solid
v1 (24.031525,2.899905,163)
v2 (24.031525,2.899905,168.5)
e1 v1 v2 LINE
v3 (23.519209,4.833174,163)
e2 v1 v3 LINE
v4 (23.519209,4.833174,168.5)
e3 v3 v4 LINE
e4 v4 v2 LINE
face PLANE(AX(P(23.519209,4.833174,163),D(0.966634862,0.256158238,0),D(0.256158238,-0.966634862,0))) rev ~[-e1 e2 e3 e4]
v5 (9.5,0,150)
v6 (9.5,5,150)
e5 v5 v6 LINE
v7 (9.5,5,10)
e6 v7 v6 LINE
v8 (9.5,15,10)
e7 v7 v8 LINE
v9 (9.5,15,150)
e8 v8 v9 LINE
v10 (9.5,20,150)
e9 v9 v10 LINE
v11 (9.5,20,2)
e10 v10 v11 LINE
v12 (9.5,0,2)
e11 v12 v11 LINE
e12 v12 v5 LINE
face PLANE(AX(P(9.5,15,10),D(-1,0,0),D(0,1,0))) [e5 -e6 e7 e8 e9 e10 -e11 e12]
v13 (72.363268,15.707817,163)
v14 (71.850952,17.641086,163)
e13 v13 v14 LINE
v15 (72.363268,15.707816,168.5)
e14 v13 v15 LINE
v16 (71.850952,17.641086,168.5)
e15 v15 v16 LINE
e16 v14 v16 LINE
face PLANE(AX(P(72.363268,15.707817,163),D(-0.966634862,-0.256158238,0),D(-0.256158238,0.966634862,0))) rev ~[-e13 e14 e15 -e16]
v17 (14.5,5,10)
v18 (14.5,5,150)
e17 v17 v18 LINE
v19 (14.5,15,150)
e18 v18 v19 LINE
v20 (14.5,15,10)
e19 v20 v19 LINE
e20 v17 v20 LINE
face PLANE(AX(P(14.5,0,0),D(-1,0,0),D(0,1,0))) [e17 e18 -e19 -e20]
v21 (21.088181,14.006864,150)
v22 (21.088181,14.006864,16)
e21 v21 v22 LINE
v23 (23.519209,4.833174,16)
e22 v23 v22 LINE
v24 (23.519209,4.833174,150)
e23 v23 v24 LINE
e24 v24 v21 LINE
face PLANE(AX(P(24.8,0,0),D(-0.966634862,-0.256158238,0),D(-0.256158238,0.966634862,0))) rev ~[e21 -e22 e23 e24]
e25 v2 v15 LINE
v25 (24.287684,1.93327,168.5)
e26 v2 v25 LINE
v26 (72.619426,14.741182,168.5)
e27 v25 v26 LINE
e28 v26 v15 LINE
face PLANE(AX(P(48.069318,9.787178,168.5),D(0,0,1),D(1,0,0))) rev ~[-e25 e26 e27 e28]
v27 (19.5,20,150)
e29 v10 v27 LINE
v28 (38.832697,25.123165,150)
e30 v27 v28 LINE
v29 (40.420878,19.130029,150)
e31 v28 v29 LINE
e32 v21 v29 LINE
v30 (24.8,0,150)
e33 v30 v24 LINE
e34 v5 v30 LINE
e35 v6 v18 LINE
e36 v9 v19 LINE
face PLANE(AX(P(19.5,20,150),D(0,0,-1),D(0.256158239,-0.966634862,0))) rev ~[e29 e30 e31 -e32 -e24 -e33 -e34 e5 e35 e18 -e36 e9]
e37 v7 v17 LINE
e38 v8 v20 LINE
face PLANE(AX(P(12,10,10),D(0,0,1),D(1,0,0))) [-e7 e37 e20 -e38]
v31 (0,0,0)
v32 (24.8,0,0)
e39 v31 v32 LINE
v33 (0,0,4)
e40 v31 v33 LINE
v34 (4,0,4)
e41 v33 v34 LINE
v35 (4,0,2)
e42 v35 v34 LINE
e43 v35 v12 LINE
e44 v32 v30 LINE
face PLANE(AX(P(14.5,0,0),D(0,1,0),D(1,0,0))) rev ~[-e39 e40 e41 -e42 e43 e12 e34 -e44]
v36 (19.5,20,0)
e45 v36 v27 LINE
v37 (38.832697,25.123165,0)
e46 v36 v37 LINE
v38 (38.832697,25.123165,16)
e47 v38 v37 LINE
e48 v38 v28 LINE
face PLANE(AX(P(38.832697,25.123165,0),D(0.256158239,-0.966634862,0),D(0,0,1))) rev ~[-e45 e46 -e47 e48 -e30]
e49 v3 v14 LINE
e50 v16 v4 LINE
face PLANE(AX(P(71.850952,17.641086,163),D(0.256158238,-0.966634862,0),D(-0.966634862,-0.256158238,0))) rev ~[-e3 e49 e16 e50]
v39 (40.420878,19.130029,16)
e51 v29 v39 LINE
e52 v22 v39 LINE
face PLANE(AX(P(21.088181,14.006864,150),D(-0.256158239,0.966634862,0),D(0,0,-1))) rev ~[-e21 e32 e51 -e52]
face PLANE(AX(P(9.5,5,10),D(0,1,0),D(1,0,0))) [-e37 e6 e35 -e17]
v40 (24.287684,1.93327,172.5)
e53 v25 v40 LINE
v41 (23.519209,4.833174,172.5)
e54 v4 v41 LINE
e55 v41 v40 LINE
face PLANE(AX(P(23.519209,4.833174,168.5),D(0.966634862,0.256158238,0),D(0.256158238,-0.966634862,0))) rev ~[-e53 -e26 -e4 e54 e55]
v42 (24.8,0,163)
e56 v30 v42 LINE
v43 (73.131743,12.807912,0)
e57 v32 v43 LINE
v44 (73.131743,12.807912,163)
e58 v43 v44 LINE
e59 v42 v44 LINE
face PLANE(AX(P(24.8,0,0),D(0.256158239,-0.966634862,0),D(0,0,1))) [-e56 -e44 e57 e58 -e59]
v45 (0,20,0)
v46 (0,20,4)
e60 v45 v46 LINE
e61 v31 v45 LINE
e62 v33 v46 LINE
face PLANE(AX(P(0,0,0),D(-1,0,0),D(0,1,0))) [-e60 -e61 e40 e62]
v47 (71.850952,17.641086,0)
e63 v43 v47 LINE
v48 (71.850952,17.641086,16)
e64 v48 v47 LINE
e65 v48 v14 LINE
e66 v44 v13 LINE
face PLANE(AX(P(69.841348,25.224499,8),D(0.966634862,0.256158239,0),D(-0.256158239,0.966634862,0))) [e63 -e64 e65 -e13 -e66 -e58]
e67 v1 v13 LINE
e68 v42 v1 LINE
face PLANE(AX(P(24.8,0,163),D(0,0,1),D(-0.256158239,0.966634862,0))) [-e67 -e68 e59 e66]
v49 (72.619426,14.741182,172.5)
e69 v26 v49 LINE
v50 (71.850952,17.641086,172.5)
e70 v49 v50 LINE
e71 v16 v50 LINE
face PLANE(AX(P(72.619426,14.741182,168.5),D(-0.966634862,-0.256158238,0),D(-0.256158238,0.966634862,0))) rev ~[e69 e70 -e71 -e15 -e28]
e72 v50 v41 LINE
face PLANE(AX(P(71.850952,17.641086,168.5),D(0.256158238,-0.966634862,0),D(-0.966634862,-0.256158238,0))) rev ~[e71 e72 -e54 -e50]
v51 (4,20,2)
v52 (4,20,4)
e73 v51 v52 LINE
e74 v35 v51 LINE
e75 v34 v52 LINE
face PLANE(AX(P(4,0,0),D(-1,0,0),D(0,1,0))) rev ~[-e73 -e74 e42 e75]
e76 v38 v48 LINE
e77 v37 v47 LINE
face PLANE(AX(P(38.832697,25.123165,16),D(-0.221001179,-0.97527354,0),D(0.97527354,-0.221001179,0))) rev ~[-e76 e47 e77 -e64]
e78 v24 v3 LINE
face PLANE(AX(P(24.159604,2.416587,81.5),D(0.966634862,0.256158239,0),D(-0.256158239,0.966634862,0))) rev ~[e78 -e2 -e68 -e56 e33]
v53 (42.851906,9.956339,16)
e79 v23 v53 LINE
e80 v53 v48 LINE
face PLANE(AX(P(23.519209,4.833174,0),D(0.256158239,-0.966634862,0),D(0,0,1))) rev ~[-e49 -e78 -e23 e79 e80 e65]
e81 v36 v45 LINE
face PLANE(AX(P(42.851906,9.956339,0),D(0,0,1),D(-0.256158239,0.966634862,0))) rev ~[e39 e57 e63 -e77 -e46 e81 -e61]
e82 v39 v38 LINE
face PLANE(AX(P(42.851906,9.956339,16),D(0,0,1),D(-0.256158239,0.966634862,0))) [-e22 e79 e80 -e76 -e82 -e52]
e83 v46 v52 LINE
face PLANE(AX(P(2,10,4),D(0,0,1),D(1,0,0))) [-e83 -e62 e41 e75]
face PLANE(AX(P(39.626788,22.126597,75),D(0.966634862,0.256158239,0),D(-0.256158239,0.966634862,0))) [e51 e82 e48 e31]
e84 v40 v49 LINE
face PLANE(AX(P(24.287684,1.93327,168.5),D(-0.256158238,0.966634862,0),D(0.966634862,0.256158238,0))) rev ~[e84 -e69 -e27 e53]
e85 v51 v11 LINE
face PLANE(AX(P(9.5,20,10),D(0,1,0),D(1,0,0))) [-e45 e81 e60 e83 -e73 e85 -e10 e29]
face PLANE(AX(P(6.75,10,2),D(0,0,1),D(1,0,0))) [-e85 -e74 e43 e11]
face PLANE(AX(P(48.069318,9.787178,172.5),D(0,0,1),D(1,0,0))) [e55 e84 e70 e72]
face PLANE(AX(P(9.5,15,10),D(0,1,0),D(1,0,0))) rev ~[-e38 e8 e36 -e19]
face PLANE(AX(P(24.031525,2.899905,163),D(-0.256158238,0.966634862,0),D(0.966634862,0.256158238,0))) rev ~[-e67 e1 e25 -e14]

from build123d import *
from build123d import SkipClean  # not in build123d's __all__

# Parameters (mm, degrees)
F0_W      = 4
F0_H      = 20
F1_DEPTH  = 4
F2_W      = 5.5
F2_H      = 20
F3_DEPTH  = 2
F4_W      = 5
F4_H      = 20
F5_DEPTH  = 10
F6_W      = 5
F6_H      = 20
F7_DEPTH  = 150
F8_W      = 5
F8_H      = 5
F9_DEPTH  = 140
F10_W     = 5
F10_H     = 163
F11_DEPTH = 50
F12_W     = 9.4903359083
F12_H     = 16
F13_DEPTH = 20
F14_W     = 15.6903359083
F14_H     = 16
F15_DEPTH = 30
F17_DEPTH = 16
F19_DEPTH = 5.5
F21_DEPTH = 4


with BuildPart() as f1:
    # F0 (on Top) → F1 (new body)
    with BuildSketch(Plane.XY):
        with Locations((2, 10)):
            Rectangle(F0_W, F0_H)
    extrude(amount=F1_DEPTH)

    # F2 (on Top) → F3 (join)
    with BuildSketch(Plane.XY):
        with Locations((6.75, 10)):
            Rectangle(F2_W, F2_H)
    extrude(amount=F3_DEPTH)

    # F4 (on Top) → F5 (join)
    with BuildSketch(Plane.XY):
        with Locations((12, 10)):
            Rectangle(F4_W, F4_H)
    extrude(amount=F5_DEPTH)

    # F6 (on Top) → F7 (join)
    with BuildSketch(Plane.XY):
        with Locations((17, 10)):
            Rectangle(F6_W, F6_H)
        Polygon((24.8, 0), (19.5, 20), (19.5, 0), align=None)
    extrude(amount=F7_DEPTH)

    # F8 (on face) → F9 (join)
    with BuildSketch(Plane.XY.offset(10)):
        with Locations((12, 17.5)):
            Rectangle(F8_W, F8_H)
        with Locations((12, 2.5)):
            Rectangle(F8_W, F8_H)
    extrude(amount=F9_DEPTH)

    # F10 (on face) → F11 (join)
    with BuildSketch(Plane(origin=(23.17269733, 6.1407647925, 0), x_dir=(-0.2561582385, 0.9666348622, 0), z_dir=(0.9666348622, 0.2561582385, 0))):
        with Locations((-3.8527243145, 81.5)):
            Rectangle(F10_W, F10_H)
    extrude(amount=F11_DEPTH)

    # F12 (on face) → F13 (join)
    with BuildSketch(Plane(origin=(23.17269733, 6.1407647925, 0), x_dir=(-0.2561582385, 0.9666348622, 0), z_dir=(0.9666348622, 0.2561582385, 0))):
        Polygon((14.3376115938, 0), (14.3376115938, 150), (8.1376115938, 150), (8.1376115938, 16), (8.1376115938, 0), align=None)
        with Locations((3.3924436397, 8)):
            Rectangle(F12_W, F12_H)
    extrude(amount=F13_DEPTH)

    # F14 (on face) → F15 (join)
    with BuildSketch(Plane(origin=(42.5053945744, 11.2639295622, 0), x_dir=(-0.2561582385, 0.9666348622, 0), z_dir=(0.9666348622, 0.2561582385, 0))):
        with Locations((6.4924436397, 8)):
            Rectangle(F14_W, F14_H)
    extrude(amount=F15_DEPTH)

    # F16 (on face) → F17 (cut)
    with BuildSketch(Plane.XY.offset(16)):
        Polygon((67.8317431109, 32.8079119244), (38.8326972444, 25.1231647698), (71.8509519185, 17.6410862355), align=None)
    extrude(amount=-F17_DEPTH, mode=Mode.SUBTRACT)

    # F18 (on face) → F19 (join)
    with BuildSketch(Plane.XY.offset(163)):
        Polygon((71.8509519185, 17.6410862355), (23.5192088076, 4.8331743111), (24.0315252845, 2.8999045867), (72.3632683954, 15.707816511), align=None)
    extrude(amount=F19_DEPTH)

    # F20 (on face) → F21 (join)
    with BuildSketch(Plane.XY.offset(168.5)):
        Polygon((71.8509515411, 17.6410861355), (23.5192088076, 4.8331743111), (24.287683523, 1.9332697244), (72.6194262566, 14.7411815488), align=None)
    with SkipClean():  # cleaning this boolean's faces spoils the solid; the shape is the same uncleaned
        extrude(amount=F21_DEPTH)


solid = f1.part
